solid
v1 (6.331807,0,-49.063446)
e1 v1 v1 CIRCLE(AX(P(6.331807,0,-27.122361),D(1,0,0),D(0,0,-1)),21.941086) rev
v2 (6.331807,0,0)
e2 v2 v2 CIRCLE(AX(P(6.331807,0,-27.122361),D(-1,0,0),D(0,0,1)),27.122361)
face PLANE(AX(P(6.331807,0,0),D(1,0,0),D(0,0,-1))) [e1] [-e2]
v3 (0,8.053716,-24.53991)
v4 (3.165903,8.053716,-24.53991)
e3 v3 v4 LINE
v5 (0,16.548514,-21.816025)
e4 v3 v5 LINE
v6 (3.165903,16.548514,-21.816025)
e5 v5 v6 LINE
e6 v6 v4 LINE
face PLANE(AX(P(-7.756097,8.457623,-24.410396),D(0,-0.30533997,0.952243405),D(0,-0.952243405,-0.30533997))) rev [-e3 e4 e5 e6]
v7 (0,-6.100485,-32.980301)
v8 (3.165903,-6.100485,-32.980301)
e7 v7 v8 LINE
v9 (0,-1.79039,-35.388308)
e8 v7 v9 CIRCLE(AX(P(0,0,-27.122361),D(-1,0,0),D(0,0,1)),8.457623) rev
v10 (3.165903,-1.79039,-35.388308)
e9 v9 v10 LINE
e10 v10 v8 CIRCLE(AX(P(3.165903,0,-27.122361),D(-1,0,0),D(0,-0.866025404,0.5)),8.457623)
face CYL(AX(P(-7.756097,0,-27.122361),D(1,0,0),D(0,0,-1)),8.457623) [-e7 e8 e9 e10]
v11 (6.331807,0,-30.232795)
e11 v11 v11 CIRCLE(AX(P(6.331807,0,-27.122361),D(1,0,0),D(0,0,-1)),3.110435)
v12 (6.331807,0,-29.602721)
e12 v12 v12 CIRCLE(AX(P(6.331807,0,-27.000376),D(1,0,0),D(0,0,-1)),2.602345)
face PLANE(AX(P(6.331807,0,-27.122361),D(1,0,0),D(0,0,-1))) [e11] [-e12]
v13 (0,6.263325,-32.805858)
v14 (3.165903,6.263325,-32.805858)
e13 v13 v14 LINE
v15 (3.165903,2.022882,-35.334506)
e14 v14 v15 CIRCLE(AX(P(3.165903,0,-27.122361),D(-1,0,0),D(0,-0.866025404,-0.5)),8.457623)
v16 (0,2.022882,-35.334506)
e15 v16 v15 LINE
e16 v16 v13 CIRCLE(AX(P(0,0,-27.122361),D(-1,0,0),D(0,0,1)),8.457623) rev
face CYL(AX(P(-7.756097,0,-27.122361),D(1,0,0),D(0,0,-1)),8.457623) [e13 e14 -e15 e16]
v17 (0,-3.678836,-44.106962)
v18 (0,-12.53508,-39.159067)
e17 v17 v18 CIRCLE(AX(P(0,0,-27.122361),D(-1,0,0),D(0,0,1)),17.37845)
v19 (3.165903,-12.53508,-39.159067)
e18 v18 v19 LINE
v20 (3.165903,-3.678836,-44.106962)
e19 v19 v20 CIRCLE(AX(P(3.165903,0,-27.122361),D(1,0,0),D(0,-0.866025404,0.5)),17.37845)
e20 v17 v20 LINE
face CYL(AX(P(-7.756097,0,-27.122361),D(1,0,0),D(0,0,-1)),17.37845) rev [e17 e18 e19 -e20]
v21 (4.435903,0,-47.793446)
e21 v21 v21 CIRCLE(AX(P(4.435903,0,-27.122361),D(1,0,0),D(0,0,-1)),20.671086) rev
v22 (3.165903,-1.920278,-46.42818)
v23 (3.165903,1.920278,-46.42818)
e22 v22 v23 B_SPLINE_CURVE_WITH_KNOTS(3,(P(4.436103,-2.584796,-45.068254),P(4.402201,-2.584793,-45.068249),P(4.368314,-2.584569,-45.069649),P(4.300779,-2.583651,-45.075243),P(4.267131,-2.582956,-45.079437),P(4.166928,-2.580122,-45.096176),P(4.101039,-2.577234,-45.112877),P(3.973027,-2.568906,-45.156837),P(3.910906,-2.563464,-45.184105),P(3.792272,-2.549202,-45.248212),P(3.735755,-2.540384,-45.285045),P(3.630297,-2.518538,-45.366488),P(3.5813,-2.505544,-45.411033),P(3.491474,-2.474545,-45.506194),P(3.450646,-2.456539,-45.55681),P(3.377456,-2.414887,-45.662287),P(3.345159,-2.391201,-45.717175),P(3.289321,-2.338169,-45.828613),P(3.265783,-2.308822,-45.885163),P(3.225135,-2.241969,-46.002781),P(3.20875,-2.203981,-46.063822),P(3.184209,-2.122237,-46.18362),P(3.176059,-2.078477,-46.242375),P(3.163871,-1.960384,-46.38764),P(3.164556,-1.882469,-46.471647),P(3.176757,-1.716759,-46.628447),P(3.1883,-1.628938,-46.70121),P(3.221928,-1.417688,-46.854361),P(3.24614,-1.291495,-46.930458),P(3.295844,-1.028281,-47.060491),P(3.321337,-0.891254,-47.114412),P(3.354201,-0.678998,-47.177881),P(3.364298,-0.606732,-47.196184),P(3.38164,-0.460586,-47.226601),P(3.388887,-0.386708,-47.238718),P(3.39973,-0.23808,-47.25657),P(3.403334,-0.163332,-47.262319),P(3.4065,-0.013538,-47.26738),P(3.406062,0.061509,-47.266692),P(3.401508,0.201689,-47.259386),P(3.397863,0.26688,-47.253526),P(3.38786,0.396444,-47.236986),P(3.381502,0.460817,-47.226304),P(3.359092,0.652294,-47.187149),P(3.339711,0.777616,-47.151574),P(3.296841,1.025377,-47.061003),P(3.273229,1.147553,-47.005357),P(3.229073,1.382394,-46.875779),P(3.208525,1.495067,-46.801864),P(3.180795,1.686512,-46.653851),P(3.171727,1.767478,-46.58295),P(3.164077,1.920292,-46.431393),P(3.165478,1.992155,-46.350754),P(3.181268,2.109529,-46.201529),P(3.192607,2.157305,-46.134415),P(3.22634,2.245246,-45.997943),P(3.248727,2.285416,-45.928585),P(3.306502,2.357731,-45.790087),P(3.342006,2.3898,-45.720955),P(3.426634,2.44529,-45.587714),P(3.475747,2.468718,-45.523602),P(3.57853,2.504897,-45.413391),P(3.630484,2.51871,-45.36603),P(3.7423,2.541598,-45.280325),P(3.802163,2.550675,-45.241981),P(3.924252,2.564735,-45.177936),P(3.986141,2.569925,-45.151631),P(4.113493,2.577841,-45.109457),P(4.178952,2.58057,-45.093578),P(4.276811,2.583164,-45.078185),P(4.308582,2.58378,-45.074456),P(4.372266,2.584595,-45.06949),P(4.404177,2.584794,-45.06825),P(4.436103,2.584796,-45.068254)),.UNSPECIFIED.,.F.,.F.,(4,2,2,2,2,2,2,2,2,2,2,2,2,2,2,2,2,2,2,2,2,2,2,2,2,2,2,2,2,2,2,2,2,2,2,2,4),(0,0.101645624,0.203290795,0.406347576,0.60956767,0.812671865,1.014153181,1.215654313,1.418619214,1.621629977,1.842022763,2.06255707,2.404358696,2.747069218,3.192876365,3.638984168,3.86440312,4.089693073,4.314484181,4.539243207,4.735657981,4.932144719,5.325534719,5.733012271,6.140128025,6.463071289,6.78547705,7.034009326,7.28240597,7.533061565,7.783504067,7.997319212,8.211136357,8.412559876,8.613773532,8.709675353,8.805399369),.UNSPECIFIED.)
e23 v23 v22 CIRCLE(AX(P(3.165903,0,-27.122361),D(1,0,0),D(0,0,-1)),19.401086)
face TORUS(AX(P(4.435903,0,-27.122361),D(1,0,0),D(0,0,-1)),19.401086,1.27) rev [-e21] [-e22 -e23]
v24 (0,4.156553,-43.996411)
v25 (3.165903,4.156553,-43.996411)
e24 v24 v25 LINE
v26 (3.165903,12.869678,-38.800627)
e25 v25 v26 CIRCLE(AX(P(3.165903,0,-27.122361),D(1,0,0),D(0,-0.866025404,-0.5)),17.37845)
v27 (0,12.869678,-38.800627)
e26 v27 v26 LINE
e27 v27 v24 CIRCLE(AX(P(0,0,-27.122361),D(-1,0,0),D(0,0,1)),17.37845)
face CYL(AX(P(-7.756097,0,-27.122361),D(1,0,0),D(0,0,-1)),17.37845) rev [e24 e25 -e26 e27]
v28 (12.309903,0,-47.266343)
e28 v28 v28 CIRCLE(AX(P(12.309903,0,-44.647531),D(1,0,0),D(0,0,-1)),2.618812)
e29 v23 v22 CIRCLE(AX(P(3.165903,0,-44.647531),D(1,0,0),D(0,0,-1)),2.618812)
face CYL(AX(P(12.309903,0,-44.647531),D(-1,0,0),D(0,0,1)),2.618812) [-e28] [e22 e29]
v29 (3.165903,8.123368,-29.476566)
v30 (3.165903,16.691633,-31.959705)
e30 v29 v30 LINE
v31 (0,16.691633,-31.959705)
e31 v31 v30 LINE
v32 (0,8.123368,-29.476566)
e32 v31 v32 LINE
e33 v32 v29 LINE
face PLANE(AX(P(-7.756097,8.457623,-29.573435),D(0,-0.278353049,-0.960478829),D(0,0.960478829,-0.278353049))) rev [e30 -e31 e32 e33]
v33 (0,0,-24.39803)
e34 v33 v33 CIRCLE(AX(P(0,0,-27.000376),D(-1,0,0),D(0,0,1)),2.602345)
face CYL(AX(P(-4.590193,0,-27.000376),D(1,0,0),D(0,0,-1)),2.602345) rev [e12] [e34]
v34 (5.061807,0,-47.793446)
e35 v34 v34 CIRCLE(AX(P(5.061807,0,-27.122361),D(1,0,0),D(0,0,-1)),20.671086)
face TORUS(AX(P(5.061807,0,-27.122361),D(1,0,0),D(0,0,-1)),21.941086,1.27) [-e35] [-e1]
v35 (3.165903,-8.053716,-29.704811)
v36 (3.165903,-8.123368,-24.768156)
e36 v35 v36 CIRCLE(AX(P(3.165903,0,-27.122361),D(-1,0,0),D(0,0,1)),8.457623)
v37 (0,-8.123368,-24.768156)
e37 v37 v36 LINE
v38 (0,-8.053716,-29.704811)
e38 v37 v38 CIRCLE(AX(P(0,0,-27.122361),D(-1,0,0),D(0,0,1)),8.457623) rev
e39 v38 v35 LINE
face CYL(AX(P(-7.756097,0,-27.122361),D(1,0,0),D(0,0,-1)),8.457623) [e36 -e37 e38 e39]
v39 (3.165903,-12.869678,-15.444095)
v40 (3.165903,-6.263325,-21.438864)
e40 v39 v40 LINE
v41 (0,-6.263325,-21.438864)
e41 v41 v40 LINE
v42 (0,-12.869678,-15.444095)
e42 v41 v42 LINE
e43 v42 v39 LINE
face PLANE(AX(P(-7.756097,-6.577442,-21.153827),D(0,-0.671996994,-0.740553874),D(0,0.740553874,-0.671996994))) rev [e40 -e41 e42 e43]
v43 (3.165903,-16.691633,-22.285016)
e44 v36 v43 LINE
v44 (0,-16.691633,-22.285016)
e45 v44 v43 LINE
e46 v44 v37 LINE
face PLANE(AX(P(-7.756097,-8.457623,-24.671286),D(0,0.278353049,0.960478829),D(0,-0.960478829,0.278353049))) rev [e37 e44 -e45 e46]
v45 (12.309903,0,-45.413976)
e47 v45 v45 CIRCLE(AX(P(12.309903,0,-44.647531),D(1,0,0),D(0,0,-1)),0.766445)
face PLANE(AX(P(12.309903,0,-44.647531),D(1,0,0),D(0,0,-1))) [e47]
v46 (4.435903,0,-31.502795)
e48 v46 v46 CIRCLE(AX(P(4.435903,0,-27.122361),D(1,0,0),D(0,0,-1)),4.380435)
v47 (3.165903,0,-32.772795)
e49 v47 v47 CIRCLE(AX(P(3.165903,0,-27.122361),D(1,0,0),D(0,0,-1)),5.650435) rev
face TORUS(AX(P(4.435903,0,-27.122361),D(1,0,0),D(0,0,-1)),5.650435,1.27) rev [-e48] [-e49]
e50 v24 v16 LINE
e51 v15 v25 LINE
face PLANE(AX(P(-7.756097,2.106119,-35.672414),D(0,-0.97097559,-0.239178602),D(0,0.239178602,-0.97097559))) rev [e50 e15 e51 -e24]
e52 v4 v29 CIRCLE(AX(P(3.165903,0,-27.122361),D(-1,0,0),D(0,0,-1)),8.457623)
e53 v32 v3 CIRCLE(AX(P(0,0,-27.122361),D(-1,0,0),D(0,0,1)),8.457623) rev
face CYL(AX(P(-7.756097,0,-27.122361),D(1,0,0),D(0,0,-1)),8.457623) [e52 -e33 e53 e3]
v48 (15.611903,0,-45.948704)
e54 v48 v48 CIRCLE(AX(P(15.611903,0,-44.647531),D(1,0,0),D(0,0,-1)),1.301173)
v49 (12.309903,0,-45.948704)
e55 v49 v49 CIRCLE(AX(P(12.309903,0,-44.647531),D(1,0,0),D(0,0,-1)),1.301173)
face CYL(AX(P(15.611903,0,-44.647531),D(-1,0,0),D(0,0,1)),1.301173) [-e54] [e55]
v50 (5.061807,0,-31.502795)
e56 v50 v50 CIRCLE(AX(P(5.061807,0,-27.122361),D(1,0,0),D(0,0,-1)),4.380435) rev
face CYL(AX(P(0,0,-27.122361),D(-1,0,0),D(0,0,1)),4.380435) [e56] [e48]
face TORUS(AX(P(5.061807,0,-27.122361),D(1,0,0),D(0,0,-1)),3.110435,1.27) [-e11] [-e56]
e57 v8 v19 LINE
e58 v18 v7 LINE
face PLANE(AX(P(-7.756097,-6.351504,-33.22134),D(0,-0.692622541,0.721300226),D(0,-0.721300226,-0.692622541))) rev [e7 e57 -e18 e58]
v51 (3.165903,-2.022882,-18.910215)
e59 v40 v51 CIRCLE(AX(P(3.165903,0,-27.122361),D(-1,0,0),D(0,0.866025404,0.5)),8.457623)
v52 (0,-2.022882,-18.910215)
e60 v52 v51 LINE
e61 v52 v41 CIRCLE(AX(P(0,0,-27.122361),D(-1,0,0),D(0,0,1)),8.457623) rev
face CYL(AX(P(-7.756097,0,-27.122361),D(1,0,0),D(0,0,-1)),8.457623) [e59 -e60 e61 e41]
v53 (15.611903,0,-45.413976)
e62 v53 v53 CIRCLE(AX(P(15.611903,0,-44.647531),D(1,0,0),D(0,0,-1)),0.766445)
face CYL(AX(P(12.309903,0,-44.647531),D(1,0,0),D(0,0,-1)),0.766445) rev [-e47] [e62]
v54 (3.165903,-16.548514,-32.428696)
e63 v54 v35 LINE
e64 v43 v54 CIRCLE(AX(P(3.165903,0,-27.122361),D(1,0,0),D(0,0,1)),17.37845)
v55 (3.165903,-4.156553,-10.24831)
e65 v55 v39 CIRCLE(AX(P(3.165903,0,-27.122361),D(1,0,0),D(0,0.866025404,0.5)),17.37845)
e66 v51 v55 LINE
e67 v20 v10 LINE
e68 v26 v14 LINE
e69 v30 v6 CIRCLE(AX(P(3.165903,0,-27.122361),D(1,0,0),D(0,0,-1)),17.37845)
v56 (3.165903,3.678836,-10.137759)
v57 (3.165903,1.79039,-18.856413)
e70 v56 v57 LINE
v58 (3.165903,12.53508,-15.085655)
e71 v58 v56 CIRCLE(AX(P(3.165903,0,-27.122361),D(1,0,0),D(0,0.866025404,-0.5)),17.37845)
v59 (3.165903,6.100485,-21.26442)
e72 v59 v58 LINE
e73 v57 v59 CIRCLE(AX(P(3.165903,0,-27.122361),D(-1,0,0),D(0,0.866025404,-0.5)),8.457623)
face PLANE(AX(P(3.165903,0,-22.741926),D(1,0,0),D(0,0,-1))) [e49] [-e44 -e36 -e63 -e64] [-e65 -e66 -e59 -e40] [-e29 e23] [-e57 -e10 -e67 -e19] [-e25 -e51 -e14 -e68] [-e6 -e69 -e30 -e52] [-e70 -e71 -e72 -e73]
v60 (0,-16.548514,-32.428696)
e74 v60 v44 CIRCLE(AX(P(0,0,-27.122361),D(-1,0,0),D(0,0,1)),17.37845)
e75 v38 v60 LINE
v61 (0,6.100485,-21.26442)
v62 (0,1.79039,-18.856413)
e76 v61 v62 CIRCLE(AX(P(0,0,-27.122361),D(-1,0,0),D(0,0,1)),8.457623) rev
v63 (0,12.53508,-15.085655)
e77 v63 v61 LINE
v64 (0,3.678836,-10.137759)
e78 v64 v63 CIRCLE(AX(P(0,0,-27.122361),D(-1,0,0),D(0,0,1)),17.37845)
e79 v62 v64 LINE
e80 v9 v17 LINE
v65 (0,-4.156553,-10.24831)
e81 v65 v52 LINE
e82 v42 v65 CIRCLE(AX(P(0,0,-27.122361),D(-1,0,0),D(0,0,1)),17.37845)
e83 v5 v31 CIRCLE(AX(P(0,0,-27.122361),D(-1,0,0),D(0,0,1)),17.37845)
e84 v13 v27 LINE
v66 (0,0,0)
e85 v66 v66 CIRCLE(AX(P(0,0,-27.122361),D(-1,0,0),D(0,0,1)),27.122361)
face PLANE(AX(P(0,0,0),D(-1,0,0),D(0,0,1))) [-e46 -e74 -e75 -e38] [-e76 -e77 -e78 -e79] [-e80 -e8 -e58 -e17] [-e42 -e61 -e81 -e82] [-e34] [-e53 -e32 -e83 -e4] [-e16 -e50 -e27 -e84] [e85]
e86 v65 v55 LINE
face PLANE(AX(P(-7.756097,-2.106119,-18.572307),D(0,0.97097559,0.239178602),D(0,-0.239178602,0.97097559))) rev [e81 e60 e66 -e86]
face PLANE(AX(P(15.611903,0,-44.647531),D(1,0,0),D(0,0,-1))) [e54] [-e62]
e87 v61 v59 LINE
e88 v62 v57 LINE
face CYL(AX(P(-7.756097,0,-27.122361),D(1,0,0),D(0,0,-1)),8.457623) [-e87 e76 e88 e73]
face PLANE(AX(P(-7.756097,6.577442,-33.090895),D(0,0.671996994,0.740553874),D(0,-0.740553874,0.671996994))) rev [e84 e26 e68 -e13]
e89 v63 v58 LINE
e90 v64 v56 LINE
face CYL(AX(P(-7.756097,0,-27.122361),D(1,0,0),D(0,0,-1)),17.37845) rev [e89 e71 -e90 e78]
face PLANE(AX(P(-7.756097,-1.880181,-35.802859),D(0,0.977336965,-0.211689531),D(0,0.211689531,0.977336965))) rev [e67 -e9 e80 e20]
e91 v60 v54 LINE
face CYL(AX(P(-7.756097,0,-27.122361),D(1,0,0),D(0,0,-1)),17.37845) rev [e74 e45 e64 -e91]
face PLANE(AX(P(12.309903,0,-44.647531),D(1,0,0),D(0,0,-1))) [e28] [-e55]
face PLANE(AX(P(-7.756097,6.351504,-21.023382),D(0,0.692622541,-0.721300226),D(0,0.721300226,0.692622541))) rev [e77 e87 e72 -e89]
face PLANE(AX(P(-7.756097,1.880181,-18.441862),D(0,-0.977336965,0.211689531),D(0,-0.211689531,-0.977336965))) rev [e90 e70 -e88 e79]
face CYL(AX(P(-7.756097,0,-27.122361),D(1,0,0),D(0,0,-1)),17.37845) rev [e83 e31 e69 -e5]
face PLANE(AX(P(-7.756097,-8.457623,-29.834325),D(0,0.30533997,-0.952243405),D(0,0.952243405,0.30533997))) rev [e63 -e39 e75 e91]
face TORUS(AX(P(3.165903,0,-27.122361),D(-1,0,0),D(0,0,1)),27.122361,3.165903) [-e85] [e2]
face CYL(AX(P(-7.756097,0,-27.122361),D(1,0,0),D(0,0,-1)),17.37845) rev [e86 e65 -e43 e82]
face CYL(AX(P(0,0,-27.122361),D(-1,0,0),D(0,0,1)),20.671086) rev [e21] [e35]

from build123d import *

# Parameters (mm, degrees)
CUT_EXTRUDE2_DEPTH  = 10.922
CIRPATTERN1_COUNT   = 6
SKETCH3_R           = 2.602345469
CUT_EXTRUDE3_DEPTH  = 10.922
FILLET2_R           = 1.27
SKETCH4_R           = 2.618812166
BOSS_EXTRUDE1_DEPTH = 9.144
SKETCH5_R           = 1.301172735
BOSS_EXTRUDE2_DEPTH = 3.302
SKETCH6_R           = 0.7664453
CUT_EXTRUDE4_DEPTH  = 3.302


# Read off the part's stored shape, not the designer's step: Revolve4
with BuildPart() as part:
    # Revolve4 outline → Revolve4 (revolve)
    with BuildSketch(Plane.YX.offset(27.122360615)):
        with BuildLine():
            Line((27.122360615, 6.331807), (20.671085558, 6.331807))
            Line((20.671085558, 6.331807), (20.671085558, 3.1659035))
            Line((20.671085558, 3.1659035), (4.380434598, 3.1659035))
            Line((4.380434598, 3.1659035), (4.380434598, 6.331807))
            Line((4.380434598, 6.331807), (0, 6.331807))
            Line((0, 6.331807), (0, 0))
            Line((0, 0), (27.122360615, 0))
            ThreePointArc((27.122360615, 0), (30.288264114, 3.1659035), (27.122360615, 6.331807))
        make_face()
    revolve(axis=Axis((0, 0, -27.122360615), (1, 0, 0)))

    # Sketch2 → Cut-Extrude2 (cut)
    with BuildSketch(Plane(origin=(3.1659035, 0, 0), x_dir=(0, 0, -1), z_dir=(1, 0, 0))):
        with BuildLine():
            Line((24.410396138, 8.457622774), (24.539910327, 8.053715509))
            ThreePointArc((24.539910327, 8.053715509), (27.003042461, 8.456781076), (29.476565703, 8.123367614))
            Line((29.476565703, 8.123367614), (29.573435035, 8.457622774))
            Line((29.573435035, 8.457622774), (31.959705051, 16.691632912))
            ThreePointArc((31.959705051, 16.691632912), (26.877189534, 17.376720105), (21.816025328, 16.548514021))
            Line((21.816025328, 16.548514021), (24.410396138, 8.457622774))
        make_face()
    cut_extrude2 = extrude(amount=-CUT_EXTRUDE2_DEPTH, mode=Mode.SUBTRACT)

    # CirPattern1: Cut-Extrude2 ×6 about axis
    cirpattern1_axis = Axis((6.331807, 0, -27.122360615), (-1, 0, 0))
    for i in range(1, CIRPATTERN1_COUNT):
        add(cut_extrude2.rotate(cirpattern1_axis, i * 360 / CIRPATTERN1_COUNT), mode=Mode.SUBTRACT)

    # Sketch3 → Cut-Extrude3 (cut)
    with BuildSketch(Plane(origin=(6.331807, 0, 0), x_dir=(0, 0, -1), z_dir=(1, 0, 0))):
        with Locations((27.000375671, 0)):
            Circle(SKETCH3_R)
    extrude(amount=-CUT_EXTRUDE3_DEPTH, mode=Mode.SUBTRACT)

    # Fillet2
    fillet2_edges = [part.edges().sort_by_distance(p)[0] for p in [
        (6.331807, -4.380434598, -27.122360615),
        (3.1659035, -4.380434598, -27.122360615),
        (3.1659035, -20.671085558, -27.122360615),
        (6.331807, -20.671085558, -27.122360615),
    ]]
    fillet(fillet2_edges, radius=FILLET2_R)

    # Sketch4 → Boss-Extrude1 (add)
    with BuildSketch(Plane(origin=(3.1659035, 0, 0), x_dir=(0, 0, -1), z_dir=(1, 0, 0))):
        with Locations((44.647530883, 0)):
            Circle(SKETCH4_R)
    extrude(amount=BOSS_EXTRUDE1_DEPTH)

    # Sketch5 → Boss-Extrude2 (add)
    with BuildSketch(Plane(origin=(12.3099035, 0, 0), x_dir=(0, 0, -1), z_dir=(1, 0, 0))):
        with Locations((44.647530883, 0)):
            Circle(SKETCH5_R)
    extrude(amount=BOSS_EXTRUDE2_DEPTH)

    # Sketch6 → Cut-Extrude4 (cut)
    with BuildSketch(Plane(origin=(15.6119035, 0, 0), x_dir=(0, 0, -1), z_dir=(1, 0, 0))):
        with Locations((44.647530883, 0)):
            Circle(SKETCH6_R)
    extrude(amount=-CUT_EXTRUDE4_DEPTH, mode=Mode.SUBTRACT)


solid = part.part
